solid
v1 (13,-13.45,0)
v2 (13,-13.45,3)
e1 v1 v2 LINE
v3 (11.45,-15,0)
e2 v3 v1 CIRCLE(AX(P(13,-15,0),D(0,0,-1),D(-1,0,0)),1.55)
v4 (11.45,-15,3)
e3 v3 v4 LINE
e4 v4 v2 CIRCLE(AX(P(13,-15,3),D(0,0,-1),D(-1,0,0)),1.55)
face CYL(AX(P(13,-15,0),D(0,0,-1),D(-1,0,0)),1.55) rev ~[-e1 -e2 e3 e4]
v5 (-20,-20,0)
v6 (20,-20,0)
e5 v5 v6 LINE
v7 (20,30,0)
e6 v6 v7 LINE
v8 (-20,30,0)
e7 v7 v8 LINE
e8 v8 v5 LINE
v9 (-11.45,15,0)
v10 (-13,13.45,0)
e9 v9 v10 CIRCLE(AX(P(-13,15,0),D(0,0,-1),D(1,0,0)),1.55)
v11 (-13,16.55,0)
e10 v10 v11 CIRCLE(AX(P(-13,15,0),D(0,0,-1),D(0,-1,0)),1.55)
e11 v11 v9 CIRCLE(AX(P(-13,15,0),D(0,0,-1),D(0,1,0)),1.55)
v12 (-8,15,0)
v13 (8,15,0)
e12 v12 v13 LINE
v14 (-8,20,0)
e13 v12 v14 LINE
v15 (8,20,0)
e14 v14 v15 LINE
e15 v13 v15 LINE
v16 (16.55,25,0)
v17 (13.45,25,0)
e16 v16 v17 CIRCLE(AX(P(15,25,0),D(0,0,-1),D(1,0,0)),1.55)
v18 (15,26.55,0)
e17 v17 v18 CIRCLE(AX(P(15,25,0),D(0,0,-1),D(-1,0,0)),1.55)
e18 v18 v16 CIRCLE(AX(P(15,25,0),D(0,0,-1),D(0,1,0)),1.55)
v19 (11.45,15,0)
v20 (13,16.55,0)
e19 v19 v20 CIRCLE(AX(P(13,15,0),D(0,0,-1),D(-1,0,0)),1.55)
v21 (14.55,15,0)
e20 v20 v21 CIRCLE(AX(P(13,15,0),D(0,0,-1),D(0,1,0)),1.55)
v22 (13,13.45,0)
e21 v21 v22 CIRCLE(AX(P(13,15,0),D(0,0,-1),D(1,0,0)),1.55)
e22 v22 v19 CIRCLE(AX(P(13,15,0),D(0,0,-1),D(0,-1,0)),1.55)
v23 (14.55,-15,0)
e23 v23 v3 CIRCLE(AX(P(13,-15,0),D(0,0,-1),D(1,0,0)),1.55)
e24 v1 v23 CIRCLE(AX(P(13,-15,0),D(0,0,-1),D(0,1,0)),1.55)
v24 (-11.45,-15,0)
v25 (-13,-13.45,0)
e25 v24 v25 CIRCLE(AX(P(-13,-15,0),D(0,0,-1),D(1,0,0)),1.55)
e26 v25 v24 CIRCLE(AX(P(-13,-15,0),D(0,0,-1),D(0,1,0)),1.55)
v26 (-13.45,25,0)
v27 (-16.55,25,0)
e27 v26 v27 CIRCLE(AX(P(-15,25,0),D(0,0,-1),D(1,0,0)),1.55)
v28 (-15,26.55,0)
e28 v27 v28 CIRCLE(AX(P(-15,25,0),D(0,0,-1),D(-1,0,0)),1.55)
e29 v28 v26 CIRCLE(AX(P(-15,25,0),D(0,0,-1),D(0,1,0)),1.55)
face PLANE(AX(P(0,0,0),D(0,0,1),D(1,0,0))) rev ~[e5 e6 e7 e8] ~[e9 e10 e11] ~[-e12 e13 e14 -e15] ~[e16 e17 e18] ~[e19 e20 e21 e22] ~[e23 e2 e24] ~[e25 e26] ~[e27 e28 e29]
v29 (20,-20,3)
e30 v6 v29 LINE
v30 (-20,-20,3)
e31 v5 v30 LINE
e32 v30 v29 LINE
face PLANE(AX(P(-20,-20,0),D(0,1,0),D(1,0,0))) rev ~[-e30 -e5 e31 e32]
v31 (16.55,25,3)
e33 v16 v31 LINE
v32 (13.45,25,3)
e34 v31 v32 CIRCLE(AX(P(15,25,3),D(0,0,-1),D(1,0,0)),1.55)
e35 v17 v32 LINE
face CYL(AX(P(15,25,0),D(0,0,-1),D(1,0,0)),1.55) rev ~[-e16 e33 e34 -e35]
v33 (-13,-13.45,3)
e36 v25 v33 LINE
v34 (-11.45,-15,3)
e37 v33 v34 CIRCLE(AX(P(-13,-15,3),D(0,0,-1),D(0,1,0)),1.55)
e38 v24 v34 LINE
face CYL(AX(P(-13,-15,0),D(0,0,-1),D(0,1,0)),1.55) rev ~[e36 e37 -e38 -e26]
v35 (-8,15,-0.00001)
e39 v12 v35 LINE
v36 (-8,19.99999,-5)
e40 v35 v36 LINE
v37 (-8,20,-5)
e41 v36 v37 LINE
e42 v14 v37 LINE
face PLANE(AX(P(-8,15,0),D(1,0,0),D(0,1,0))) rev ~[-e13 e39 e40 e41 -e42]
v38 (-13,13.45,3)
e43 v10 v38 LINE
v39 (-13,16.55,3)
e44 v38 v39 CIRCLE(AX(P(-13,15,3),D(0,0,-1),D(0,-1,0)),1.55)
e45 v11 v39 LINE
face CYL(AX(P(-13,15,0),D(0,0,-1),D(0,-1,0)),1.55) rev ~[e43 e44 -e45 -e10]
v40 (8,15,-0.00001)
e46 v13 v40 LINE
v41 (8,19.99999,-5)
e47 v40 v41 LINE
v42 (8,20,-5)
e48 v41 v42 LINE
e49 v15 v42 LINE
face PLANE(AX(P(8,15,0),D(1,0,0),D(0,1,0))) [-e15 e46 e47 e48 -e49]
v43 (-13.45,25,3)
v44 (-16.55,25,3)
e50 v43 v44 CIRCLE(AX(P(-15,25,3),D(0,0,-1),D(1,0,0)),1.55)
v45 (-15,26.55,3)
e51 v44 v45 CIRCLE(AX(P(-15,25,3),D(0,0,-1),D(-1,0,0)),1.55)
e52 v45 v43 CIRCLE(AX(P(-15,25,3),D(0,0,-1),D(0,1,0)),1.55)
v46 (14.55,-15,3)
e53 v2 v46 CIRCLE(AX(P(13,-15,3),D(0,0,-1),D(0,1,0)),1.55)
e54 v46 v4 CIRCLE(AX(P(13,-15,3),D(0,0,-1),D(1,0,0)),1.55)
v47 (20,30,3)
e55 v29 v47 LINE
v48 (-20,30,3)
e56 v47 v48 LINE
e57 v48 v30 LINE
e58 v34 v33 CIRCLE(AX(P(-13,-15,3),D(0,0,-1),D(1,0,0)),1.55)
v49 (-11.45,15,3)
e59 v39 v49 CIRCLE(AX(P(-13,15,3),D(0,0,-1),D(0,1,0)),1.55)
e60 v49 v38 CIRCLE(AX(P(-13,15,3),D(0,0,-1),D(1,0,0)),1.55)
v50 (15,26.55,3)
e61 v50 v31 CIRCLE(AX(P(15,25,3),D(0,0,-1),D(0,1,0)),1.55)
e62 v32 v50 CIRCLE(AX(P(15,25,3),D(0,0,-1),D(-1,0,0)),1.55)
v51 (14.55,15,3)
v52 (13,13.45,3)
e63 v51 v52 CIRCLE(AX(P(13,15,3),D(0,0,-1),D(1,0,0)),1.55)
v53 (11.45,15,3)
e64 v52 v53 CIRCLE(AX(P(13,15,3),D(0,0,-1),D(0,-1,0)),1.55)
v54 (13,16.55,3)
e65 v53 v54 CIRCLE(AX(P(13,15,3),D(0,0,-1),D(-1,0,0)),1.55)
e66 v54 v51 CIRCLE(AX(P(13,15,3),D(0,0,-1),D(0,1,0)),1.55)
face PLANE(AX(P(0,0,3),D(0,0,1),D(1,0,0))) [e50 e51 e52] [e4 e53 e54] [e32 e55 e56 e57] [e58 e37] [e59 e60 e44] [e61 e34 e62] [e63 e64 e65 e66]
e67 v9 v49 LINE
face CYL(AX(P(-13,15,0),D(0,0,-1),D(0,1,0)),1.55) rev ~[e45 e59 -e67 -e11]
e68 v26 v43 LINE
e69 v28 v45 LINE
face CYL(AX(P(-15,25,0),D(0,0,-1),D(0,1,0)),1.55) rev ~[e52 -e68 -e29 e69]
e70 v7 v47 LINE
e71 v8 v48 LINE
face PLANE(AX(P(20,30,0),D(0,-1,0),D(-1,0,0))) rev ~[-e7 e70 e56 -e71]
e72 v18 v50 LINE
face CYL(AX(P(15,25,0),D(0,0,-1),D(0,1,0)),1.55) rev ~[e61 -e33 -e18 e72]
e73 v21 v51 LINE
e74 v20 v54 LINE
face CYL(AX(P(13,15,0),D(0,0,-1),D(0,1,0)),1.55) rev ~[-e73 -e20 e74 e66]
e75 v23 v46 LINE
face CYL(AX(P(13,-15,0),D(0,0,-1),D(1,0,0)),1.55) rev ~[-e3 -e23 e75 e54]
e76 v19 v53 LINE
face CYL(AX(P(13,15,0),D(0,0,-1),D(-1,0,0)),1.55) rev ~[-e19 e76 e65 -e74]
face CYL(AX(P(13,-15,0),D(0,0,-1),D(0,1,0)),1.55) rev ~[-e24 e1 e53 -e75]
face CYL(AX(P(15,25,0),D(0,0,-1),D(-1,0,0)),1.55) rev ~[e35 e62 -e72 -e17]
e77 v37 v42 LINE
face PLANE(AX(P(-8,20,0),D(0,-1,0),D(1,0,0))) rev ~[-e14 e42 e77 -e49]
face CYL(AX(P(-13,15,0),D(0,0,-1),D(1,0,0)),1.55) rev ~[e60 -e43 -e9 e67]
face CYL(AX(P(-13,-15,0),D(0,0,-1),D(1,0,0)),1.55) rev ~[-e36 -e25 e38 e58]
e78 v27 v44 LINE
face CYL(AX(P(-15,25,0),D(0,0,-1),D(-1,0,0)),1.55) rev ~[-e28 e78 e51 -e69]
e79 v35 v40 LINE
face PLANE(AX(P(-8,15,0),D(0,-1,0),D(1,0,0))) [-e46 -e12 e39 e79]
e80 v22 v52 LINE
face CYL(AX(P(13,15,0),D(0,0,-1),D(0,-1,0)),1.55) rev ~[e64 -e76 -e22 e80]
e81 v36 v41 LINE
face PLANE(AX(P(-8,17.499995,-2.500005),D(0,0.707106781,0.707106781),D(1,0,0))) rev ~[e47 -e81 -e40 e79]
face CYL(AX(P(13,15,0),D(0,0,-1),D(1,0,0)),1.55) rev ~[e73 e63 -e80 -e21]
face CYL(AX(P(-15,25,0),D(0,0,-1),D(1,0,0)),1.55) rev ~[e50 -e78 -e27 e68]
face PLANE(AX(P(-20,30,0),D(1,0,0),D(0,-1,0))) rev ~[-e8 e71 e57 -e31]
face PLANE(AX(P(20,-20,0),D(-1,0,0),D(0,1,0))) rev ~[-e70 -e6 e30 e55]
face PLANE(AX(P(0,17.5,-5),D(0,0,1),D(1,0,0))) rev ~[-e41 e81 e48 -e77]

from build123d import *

# Parameters (mm, degrees)
F0_W     = 16
F0_H     = 5
F1_DEPTH = 3
F2_DEPTH = 5
F3_SIZE  = 4.99999


# Not quite as in the source:
# - a fillet or chamfer is up to 0.001 mm smaller than in the source, because OpenCascade refuses the exact size


with BuildPart() as f1:
    # F0 (on Top) → F1 (new body)
    with BuildSketch(Plane.XY):
        with BuildLine():
            ThreePointArc((-13, -13.45), (-11.9039844892, -13.9039844892), (-11.45, -15))
            Line((-11.45, -15), (11.45, -15))
            ThreePointArc((11.45, -15), (11.9039844892, -13.9039844892), (13, -13.45))
            Line((13, -13.45), (13, 13.45))
            ThreePointArc((13, 13.45), (11.9039844892, 13.9039844892), (11.45, 15))
            Line((11.45, 15), (8, 15))
            Line((8, 15), (-8, 15))
            Line((-8, 15), (-11.45, 15))
            ThreePointArc((-11.45, 15), (-11.9039844892, 13.9039844892), (-13, 13.45))
            Line((-13, 13.45), (-13, -13.45))
        make_face()
        with BuildLine():
            Line((11.45, -15), (-11.45, -15))
            ThreePointArc((-11.45, -15), (-14.0960155108, -16.0960155108), (-13, -13.45))
            Line((-13, -13.45), (-13, 13.45))
            ThreePointArc((-13, 13.45), (-14.55, 15), (-13, 16.55))
            Line((-13, 16.55), (-13, 20))
            Line((-13, 20), (-20, 20))
            Line((-20, 20), (-20, -20))
            Line((-20, -20), (20, -20))
            Line((20, -20), (20, 20))
            Line((20, 20), (13, 20))
            Line((13, 20), (13, 16.55))
            ThreePointArc((13, 16.55), (14.0960155108, 16.0960155108), (14.55, 15))
            ThreePointArc((14.55, 15), (14.0960155108, 13.9039844892), (13, 13.45))
            Line((13, 13.45), (13, -13.45))
            ThreePointArc((13, -13.45), (14.0960155108, -13.9039844892), (14.55, -15))
            ThreePointArc((14.55, -15), (13, -16.55), (11.45, -15))
        make_face()
        with BuildLine():
            Line((-13, 20), (-13, 16.55))
            ThreePointArc((-13, 16.55), (-11.9039844892, 16.0960155108), (-11.45, 15))
            Line((-11.45, 15), (-8, 15))
            Line((-8, 15), (-8, 20))
            Line((-8, 20), (-13, 20))
        make_face()
        with BuildLine():
            Line((8, 15), (11.45, 15))
            ThreePointArc((11.45, 15), (11.9039844892, 16.0960155108), (13, 16.55))
            Line((13, 16.55), (13, 20))
            Line((13, 20), (8, 20))
            Line((8, 20), (8, 15))
        make_face()
        with BuildLine():
            Line((-20, 20), (-13, 20))
            Line((-13, 20), (-8, 20))
            Line((-8, 20), (8, 20))
            Line((8, 20), (13, 20))
            Line((13, 20), (20, 20))
            Line((20, 20), (20, 30))
            Line((20, 30), (15, 30))
            Line((15, 30), (15, 26.55))
            ThreePointArc((15, 26.55), (16.0960155108, 26.0960155108), (16.55, 25))
            ThreePointArc((16.55, 25), (15, 23.45), (13.45, 25))
            Line((13.45, 25), (-13.45, 25))
            ThreePointArc((-13.45, 25), (-15, 23.45), (-16.55, 25))
            Line((-16.55, 25), (-20, 25))
            Line((-20, 25), (-20, 20))
        make_face()
        with Locations((0, 17.5)):
            Rectangle(F0_W, F0_H)
        with BuildLine():
            Line((-20, 30), (-20, 25))
            Line((-20, 25), (-16.55, 25))
            ThreePointArc((-16.55, 25), (-16.0960155108, 26.0960155108), (-15, 26.55))
            Line((-15, 26.55), (-15, 30))
            Line((-15, 30), (-20, 30))
        make_face()
        with BuildLine():
            Line((15, 30), (-15, 30))
            Line((-15, 30), (-15, 26.55))
            ThreePointArc((-15, 26.55), (-13.9039844892, 26.0960155108), (-13.45, 25))
            Line((-13.45, 25), (13.45, 25))
            ThreePointArc((13.45, 25), (13.9039844892, 26.0960155108), (15, 26.55))
            Line((15, 26.55), (15, 30))
        make_face()
    extrude(amount=F1_DEPTH)

    # F0 (on Top) → F2 (join)
    with BuildSketch(Plane.XY):
        with Locations((0, 17.5)):
            Rectangle(F0_W, F0_H)
    extrude(amount=-F2_DEPTH)

    # F3 (size 5 in the source; OpenCascade refuses exactly that, so slightly less here)
    f3_edges = [f1.edges().sort_by_distance(p)[0] for p in [
        (0, 15, -5),
    ]]
    chamfer(f3_edges, length=F3_SIZE)


solid = f1.part
